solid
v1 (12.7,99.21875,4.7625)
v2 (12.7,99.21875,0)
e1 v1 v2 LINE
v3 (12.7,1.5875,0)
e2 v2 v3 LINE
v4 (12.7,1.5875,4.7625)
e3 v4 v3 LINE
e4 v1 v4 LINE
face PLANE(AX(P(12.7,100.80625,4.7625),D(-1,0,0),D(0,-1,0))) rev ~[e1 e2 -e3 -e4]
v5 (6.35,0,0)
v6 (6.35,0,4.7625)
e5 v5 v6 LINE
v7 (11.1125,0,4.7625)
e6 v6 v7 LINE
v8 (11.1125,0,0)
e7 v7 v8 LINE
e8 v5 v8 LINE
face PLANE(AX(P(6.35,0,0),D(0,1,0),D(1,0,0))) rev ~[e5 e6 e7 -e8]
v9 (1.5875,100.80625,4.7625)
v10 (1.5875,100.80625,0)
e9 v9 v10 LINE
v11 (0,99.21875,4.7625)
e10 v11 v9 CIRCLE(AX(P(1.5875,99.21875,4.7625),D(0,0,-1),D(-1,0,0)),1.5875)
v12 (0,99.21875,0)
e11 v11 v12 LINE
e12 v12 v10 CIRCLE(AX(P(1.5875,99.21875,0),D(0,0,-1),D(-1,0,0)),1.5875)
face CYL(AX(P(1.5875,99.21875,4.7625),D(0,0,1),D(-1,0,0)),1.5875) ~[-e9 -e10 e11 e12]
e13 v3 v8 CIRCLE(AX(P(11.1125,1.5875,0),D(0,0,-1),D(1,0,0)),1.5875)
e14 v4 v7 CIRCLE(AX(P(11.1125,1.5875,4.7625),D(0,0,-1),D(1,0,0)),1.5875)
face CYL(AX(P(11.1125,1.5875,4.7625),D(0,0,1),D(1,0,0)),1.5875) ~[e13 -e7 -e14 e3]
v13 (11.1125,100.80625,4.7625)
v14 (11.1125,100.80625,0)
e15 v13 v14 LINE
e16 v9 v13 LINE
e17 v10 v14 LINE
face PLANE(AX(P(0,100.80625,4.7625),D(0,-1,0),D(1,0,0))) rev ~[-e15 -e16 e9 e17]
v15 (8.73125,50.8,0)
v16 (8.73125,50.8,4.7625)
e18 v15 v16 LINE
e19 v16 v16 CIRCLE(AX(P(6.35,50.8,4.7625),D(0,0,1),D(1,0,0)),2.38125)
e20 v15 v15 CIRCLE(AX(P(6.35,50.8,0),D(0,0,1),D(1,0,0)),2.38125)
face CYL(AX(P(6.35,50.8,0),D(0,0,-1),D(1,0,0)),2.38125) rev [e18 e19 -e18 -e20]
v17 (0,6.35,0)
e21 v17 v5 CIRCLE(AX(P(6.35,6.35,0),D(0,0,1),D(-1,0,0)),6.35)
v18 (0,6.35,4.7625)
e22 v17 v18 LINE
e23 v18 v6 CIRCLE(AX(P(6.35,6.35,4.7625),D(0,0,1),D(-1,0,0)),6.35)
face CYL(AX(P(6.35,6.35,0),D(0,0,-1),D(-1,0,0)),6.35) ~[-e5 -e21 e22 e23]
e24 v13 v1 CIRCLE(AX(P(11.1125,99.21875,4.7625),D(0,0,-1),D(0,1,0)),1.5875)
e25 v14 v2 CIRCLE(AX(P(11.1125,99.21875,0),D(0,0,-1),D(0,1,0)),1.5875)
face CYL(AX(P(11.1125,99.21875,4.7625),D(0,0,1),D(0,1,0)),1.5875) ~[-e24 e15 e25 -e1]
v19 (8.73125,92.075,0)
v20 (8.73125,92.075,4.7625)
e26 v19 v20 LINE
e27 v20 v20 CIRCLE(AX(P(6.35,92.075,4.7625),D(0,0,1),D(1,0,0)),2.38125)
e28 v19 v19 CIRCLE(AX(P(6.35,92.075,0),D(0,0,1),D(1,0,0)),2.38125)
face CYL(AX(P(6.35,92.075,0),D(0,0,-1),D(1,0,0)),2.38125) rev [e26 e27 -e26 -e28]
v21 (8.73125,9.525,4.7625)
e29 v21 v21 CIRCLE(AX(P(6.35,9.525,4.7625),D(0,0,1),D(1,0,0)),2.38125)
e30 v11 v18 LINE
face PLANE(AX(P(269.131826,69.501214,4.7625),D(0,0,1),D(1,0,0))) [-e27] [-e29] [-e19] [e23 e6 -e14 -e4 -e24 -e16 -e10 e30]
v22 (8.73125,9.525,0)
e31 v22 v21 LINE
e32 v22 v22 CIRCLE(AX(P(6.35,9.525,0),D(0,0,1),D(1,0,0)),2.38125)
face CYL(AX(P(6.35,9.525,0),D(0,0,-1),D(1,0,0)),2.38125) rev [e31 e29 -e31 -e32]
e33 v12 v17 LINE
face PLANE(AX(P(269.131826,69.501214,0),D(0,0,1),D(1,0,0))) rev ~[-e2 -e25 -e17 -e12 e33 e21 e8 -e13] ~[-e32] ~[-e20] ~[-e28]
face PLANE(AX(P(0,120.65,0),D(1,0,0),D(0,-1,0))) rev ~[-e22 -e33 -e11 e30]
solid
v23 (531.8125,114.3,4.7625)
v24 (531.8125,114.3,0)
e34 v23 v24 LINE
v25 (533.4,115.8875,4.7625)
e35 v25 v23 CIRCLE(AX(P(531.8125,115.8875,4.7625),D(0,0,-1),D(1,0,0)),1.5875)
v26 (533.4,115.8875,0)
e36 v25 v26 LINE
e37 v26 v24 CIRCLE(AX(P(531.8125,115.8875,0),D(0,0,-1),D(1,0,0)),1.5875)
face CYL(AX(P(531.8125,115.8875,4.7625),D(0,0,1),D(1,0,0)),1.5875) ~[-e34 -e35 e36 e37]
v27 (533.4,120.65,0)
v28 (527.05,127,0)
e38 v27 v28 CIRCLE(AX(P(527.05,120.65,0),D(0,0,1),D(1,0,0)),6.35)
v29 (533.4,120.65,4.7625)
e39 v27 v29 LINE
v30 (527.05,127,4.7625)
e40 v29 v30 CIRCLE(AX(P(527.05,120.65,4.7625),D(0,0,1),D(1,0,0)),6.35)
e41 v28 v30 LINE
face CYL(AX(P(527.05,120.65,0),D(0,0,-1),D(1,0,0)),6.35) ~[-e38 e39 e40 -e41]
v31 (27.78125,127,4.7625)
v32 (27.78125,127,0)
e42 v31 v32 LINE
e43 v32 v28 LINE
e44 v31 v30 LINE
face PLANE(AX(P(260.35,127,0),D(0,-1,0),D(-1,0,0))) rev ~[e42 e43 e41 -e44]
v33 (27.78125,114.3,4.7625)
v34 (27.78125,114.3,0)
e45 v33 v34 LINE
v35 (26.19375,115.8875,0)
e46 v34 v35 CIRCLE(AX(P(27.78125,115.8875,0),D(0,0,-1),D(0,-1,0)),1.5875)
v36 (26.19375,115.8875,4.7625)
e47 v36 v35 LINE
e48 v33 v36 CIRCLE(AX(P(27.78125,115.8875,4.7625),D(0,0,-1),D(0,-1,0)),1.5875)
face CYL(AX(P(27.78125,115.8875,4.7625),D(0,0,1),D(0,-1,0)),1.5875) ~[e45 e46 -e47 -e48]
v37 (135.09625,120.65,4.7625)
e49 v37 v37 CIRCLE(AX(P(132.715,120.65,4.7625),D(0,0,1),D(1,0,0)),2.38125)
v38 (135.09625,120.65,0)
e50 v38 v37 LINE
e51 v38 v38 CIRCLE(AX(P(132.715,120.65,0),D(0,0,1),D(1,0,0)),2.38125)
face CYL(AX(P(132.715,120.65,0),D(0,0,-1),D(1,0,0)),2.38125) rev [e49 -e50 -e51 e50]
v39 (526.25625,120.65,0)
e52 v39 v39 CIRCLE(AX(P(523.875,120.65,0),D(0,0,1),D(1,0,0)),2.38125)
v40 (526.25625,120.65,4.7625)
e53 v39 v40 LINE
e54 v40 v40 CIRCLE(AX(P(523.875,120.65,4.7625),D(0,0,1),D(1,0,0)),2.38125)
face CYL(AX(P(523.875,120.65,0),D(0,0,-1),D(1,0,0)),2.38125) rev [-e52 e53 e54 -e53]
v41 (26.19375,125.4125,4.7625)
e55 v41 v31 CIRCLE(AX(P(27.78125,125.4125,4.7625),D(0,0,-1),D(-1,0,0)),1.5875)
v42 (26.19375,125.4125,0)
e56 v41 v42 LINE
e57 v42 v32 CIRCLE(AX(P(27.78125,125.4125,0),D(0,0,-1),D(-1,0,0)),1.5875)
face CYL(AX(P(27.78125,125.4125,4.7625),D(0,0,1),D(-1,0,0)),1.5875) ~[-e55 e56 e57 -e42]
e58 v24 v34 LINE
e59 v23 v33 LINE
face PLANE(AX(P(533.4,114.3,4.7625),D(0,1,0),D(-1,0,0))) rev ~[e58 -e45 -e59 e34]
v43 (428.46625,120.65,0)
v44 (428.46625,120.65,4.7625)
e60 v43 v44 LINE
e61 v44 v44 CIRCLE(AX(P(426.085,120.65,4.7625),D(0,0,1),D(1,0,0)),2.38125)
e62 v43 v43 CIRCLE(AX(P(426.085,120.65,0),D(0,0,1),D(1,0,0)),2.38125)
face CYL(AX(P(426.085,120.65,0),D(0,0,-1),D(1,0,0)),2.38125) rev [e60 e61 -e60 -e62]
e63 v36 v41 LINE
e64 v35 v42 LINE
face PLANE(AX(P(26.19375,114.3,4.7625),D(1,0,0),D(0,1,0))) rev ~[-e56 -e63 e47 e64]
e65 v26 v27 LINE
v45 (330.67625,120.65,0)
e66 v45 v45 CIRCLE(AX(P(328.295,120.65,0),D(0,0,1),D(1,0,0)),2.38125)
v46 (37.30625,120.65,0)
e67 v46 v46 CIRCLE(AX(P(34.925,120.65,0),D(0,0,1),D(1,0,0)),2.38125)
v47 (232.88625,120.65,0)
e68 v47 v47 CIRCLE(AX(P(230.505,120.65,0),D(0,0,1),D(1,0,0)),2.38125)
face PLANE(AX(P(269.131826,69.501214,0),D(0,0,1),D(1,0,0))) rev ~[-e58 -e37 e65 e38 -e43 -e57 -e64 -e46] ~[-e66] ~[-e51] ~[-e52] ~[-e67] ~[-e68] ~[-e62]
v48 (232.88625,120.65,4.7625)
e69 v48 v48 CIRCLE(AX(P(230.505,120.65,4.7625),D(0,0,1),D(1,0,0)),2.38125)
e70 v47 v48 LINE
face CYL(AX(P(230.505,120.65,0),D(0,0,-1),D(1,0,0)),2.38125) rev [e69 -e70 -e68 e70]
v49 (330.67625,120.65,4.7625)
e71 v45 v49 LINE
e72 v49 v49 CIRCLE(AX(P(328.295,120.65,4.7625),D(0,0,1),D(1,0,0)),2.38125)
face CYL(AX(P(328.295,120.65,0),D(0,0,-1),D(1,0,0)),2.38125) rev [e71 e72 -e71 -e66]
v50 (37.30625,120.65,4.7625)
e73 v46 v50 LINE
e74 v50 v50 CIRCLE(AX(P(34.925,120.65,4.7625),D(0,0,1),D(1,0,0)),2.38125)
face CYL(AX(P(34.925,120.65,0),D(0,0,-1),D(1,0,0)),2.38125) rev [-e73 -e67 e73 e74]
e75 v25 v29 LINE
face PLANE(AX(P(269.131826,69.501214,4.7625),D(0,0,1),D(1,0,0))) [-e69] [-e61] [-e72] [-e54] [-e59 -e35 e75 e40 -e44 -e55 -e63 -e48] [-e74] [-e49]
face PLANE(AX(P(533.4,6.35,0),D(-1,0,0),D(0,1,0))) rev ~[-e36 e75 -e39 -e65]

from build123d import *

# Parameters (mm, degrees)
F0_R     = 2.38125
F1_DEPTH = 4.7625
F4_W     = 13.49375
F4_H     = 13.49375
F4_W_2   = 139.7
F4_H_2   = 38.1
F5_DEPTH = 4.7635
F7_DEPTH = 4.7625


# Not quite as in the source:
# - a feature of the source that left no trace in its solid (it failed there, or was rolled back) is left out


with BuildPart() as f1:
    # F0 (on Top) → F1 (new body)
    with BuildSketch(Plane.XY):
        with BuildLine():
            ThreePointArc((0, 6.35), (1.8598719395, 1.8598719395), (6.35, 0))
            Line((6.35, 0), (527.05, 0))
            ThreePointArc((527.05, 0), (531.5401280605, 1.8598719395), (533.4, 6.35))
            Line((533.4, 6.35), (533.4, 120.65))
            ThreePointArc((533.4, 120.65), (531.5401280605, 125.1401280605), (527.05, 127))
            Line((527.05, 127), (400.05, 127))
            ThreePointArc((400.05, 127), (395.5598719395, 128.8598719395), (393.7, 133.35))
            Line((393.7, 133.35), (393.7, 152.4))
            ThreePointArc((393.7, 152.4), (391.8401280605, 156.8901280605), (387.35, 158.75))
            Line((387.35, 158.75), (273.05, 158.75))
            ThreePointArc((273.05, 158.75), (268.5598719395, 156.8901280605), (266.7, 152.4))
            Line((266.7, 152.4), (266.7, 133.35))
            ThreePointArc((266.7, 133.35), (264.8401280605, 128.8598719395), (260.35, 127))
            Line((260.35, 127), (6.35, 127))
            ThreePointArc((6.35, 127), (1.8598719395, 125.1401280605), (0, 120.65))
            Line((0, 120.65), (0, 6.35))
        make_face()
        with Locations((6.35, 9.525)):
            Circle(F0_R, mode=Mode.SUBTRACT)
        with Locations((228.6, 31.75)):
            Circle(F0_R, mode=Mode.SUBTRACT)
        with Locations((6.35, 50.8)):
            Circle(F0_R, mode=Mode.SUBTRACT)
        with Locations((457.2, 31.75)):
            Circle(F0_R, mode=Mode.SUBTRACT)
        with Locations((6.35, 92.075)):
            Circle(F0_R, mode=Mode.SUBTRACT)
        with Locations((228.6, 95.25)):
            Circle(F0_R, mode=Mode.SUBTRACT)
        with Locations((34.925, 120.65)):
            Circle(F0_R, mode=Mode.SUBTRACT)
        with Locations((132.715, 120.65)):
            Circle(F0_R, mode=Mode.SUBTRACT)
        with Locations((230.505, 120.65)):
            Circle(F0_R, mode=Mode.SUBTRACT)
        with BuildLine():
            ThreePointArc((254, 107.95), (255.8598719395, 112.4401280605), (260.35, 114.3))
            Line((260.35, 114.3), (400.05, 114.3))
            ThreePointArc((400.05, 114.3), (404.5401280605, 112.4401280605), (406.4, 107.95))
            Line((406.4, 107.95), (406.4, 69.85))
            ThreePointArc((406.4, 69.85), (404.5401280605, 65.3598719395), (400.05, 63.5))
            Line((400.05, 63.5), (260.35, 63.5))
            ThreePointArc((260.35, 63.5), (255.8598719395, 65.3598719395), (254, 69.85))
            Line((254, 69.85), (254, 107.95))
        make_face(mode=Mode.SUBTRACT)
        with Locations((457.2, 95.25)):
            Circle(F0_R, mode=Mode.SUBTRACT)
        with Locations((328.295, 120.65)):
            Circle(F0_R, mode=Mode.SUBTRACT)
        with Locations((307.975, 147.6375)):
            Circle(F0_R, mode=Mode.SUBTRACT)
        with Locations((352.425, 147.6375)):
            Circle(F0_R, mode=Mode.SUBTRACT)
        with Locations((426.085, 120.65)):
            Circle(F0_R, mode=Mode.SUBTRACT)
        with Locations((523.875, 120.65)):
            Circle(F0_R, mode=Mode.SUBTRACT)
    extrude(amount=F1_DEPTH)

    # F4 (on face) → F5 (cut, through all)
    with BuildSketch(Plane.XY.offset(4.7625)):
        Polygon((26.19375, 127), (0, 127), (0, 100.80625), (12.7, 100.80625), (12.7, 114.3), (26.19375, 114.3), align=None)
        Polygon((533.4, 114.3), (26.19375, 114.3), (26.19375, 100.80625), (12.7, 100.80625), (12.7, 0), (533.4, 0), align=None)
        with Locations((19.446875, 107.553125)):
            Rectangle(F4_W, F4_H)
        with Locations((330.2, 146.05)):
            Rectangle(F4_W_2, F4_H_2)
    extrude(amount=-F5_DEPTH, mode=Mode.SUBTRACT)

    # F6 (on face) → F7 (cut, through all)
    with BuildSketch(Plane.XY.offset(4.7625)):
        with BuildLine():
            Line((12.7, 99.21875), (12.7, 100.80625))
            Line((12.7, 100.80625), (11.1125, 100.80625))
            ThreePointArc((11.1125, 100.80625), (12.2350320151, 100.3412820151), (12.7, 99.21875))
        make_face()
        with BuildLine():
            Line((1.5875, 100.80625), (0, 100.80625))
            Line((0, 100.80625), (0, 99.21875))
            ThreePointArc((0, 99.21875), (0.4649679849, 100.3412820151), (1.5875, 100.80625))
        make_face()
        with BuildLine():
            ThreePointArc((12.7, 1.5875), (12.2350320151, 0.4649679849), (11.1125, 0))
            Line((11.1125, 0), (12.7, 0))
            Line((12.7, 0), (12.7, 1.5875))
        make_face()
        with BuildLine():
            ThreePointArc((26.19375, 125.4125), (26.6587179849, 126.5350320151), (27.78125, 127))
            Line((27.78125, 127), (26.19375, 127))
            Line((26.19375, 127), (26.19375, 125.4125))
        make_face()
        with BuildLine():
            Line((26.19375, 115.8875), (26.19375, 114.3))
            Line((26.19375, 114.3), (27.78125, 114.3))
            ThreePointArc((27.78125, 114.3), (26.6587179849, 114.7649679849), (26.19375, 115.8875))
        make_face()
        with BuildLine():
            Line((531.8125, 114.3), (533.4, 114.3))
            Line((533.4, 114.3), (533.4, 115.8875))
            ThreePointArc((533.4, 115.8875), (532.9350320151, 114.7649679849), (531.8125, 114.3))
        make_face()
    extrude(amount=-F7_DEPTH, mode=Mode.SUBTRACT)


solid = f1.part
